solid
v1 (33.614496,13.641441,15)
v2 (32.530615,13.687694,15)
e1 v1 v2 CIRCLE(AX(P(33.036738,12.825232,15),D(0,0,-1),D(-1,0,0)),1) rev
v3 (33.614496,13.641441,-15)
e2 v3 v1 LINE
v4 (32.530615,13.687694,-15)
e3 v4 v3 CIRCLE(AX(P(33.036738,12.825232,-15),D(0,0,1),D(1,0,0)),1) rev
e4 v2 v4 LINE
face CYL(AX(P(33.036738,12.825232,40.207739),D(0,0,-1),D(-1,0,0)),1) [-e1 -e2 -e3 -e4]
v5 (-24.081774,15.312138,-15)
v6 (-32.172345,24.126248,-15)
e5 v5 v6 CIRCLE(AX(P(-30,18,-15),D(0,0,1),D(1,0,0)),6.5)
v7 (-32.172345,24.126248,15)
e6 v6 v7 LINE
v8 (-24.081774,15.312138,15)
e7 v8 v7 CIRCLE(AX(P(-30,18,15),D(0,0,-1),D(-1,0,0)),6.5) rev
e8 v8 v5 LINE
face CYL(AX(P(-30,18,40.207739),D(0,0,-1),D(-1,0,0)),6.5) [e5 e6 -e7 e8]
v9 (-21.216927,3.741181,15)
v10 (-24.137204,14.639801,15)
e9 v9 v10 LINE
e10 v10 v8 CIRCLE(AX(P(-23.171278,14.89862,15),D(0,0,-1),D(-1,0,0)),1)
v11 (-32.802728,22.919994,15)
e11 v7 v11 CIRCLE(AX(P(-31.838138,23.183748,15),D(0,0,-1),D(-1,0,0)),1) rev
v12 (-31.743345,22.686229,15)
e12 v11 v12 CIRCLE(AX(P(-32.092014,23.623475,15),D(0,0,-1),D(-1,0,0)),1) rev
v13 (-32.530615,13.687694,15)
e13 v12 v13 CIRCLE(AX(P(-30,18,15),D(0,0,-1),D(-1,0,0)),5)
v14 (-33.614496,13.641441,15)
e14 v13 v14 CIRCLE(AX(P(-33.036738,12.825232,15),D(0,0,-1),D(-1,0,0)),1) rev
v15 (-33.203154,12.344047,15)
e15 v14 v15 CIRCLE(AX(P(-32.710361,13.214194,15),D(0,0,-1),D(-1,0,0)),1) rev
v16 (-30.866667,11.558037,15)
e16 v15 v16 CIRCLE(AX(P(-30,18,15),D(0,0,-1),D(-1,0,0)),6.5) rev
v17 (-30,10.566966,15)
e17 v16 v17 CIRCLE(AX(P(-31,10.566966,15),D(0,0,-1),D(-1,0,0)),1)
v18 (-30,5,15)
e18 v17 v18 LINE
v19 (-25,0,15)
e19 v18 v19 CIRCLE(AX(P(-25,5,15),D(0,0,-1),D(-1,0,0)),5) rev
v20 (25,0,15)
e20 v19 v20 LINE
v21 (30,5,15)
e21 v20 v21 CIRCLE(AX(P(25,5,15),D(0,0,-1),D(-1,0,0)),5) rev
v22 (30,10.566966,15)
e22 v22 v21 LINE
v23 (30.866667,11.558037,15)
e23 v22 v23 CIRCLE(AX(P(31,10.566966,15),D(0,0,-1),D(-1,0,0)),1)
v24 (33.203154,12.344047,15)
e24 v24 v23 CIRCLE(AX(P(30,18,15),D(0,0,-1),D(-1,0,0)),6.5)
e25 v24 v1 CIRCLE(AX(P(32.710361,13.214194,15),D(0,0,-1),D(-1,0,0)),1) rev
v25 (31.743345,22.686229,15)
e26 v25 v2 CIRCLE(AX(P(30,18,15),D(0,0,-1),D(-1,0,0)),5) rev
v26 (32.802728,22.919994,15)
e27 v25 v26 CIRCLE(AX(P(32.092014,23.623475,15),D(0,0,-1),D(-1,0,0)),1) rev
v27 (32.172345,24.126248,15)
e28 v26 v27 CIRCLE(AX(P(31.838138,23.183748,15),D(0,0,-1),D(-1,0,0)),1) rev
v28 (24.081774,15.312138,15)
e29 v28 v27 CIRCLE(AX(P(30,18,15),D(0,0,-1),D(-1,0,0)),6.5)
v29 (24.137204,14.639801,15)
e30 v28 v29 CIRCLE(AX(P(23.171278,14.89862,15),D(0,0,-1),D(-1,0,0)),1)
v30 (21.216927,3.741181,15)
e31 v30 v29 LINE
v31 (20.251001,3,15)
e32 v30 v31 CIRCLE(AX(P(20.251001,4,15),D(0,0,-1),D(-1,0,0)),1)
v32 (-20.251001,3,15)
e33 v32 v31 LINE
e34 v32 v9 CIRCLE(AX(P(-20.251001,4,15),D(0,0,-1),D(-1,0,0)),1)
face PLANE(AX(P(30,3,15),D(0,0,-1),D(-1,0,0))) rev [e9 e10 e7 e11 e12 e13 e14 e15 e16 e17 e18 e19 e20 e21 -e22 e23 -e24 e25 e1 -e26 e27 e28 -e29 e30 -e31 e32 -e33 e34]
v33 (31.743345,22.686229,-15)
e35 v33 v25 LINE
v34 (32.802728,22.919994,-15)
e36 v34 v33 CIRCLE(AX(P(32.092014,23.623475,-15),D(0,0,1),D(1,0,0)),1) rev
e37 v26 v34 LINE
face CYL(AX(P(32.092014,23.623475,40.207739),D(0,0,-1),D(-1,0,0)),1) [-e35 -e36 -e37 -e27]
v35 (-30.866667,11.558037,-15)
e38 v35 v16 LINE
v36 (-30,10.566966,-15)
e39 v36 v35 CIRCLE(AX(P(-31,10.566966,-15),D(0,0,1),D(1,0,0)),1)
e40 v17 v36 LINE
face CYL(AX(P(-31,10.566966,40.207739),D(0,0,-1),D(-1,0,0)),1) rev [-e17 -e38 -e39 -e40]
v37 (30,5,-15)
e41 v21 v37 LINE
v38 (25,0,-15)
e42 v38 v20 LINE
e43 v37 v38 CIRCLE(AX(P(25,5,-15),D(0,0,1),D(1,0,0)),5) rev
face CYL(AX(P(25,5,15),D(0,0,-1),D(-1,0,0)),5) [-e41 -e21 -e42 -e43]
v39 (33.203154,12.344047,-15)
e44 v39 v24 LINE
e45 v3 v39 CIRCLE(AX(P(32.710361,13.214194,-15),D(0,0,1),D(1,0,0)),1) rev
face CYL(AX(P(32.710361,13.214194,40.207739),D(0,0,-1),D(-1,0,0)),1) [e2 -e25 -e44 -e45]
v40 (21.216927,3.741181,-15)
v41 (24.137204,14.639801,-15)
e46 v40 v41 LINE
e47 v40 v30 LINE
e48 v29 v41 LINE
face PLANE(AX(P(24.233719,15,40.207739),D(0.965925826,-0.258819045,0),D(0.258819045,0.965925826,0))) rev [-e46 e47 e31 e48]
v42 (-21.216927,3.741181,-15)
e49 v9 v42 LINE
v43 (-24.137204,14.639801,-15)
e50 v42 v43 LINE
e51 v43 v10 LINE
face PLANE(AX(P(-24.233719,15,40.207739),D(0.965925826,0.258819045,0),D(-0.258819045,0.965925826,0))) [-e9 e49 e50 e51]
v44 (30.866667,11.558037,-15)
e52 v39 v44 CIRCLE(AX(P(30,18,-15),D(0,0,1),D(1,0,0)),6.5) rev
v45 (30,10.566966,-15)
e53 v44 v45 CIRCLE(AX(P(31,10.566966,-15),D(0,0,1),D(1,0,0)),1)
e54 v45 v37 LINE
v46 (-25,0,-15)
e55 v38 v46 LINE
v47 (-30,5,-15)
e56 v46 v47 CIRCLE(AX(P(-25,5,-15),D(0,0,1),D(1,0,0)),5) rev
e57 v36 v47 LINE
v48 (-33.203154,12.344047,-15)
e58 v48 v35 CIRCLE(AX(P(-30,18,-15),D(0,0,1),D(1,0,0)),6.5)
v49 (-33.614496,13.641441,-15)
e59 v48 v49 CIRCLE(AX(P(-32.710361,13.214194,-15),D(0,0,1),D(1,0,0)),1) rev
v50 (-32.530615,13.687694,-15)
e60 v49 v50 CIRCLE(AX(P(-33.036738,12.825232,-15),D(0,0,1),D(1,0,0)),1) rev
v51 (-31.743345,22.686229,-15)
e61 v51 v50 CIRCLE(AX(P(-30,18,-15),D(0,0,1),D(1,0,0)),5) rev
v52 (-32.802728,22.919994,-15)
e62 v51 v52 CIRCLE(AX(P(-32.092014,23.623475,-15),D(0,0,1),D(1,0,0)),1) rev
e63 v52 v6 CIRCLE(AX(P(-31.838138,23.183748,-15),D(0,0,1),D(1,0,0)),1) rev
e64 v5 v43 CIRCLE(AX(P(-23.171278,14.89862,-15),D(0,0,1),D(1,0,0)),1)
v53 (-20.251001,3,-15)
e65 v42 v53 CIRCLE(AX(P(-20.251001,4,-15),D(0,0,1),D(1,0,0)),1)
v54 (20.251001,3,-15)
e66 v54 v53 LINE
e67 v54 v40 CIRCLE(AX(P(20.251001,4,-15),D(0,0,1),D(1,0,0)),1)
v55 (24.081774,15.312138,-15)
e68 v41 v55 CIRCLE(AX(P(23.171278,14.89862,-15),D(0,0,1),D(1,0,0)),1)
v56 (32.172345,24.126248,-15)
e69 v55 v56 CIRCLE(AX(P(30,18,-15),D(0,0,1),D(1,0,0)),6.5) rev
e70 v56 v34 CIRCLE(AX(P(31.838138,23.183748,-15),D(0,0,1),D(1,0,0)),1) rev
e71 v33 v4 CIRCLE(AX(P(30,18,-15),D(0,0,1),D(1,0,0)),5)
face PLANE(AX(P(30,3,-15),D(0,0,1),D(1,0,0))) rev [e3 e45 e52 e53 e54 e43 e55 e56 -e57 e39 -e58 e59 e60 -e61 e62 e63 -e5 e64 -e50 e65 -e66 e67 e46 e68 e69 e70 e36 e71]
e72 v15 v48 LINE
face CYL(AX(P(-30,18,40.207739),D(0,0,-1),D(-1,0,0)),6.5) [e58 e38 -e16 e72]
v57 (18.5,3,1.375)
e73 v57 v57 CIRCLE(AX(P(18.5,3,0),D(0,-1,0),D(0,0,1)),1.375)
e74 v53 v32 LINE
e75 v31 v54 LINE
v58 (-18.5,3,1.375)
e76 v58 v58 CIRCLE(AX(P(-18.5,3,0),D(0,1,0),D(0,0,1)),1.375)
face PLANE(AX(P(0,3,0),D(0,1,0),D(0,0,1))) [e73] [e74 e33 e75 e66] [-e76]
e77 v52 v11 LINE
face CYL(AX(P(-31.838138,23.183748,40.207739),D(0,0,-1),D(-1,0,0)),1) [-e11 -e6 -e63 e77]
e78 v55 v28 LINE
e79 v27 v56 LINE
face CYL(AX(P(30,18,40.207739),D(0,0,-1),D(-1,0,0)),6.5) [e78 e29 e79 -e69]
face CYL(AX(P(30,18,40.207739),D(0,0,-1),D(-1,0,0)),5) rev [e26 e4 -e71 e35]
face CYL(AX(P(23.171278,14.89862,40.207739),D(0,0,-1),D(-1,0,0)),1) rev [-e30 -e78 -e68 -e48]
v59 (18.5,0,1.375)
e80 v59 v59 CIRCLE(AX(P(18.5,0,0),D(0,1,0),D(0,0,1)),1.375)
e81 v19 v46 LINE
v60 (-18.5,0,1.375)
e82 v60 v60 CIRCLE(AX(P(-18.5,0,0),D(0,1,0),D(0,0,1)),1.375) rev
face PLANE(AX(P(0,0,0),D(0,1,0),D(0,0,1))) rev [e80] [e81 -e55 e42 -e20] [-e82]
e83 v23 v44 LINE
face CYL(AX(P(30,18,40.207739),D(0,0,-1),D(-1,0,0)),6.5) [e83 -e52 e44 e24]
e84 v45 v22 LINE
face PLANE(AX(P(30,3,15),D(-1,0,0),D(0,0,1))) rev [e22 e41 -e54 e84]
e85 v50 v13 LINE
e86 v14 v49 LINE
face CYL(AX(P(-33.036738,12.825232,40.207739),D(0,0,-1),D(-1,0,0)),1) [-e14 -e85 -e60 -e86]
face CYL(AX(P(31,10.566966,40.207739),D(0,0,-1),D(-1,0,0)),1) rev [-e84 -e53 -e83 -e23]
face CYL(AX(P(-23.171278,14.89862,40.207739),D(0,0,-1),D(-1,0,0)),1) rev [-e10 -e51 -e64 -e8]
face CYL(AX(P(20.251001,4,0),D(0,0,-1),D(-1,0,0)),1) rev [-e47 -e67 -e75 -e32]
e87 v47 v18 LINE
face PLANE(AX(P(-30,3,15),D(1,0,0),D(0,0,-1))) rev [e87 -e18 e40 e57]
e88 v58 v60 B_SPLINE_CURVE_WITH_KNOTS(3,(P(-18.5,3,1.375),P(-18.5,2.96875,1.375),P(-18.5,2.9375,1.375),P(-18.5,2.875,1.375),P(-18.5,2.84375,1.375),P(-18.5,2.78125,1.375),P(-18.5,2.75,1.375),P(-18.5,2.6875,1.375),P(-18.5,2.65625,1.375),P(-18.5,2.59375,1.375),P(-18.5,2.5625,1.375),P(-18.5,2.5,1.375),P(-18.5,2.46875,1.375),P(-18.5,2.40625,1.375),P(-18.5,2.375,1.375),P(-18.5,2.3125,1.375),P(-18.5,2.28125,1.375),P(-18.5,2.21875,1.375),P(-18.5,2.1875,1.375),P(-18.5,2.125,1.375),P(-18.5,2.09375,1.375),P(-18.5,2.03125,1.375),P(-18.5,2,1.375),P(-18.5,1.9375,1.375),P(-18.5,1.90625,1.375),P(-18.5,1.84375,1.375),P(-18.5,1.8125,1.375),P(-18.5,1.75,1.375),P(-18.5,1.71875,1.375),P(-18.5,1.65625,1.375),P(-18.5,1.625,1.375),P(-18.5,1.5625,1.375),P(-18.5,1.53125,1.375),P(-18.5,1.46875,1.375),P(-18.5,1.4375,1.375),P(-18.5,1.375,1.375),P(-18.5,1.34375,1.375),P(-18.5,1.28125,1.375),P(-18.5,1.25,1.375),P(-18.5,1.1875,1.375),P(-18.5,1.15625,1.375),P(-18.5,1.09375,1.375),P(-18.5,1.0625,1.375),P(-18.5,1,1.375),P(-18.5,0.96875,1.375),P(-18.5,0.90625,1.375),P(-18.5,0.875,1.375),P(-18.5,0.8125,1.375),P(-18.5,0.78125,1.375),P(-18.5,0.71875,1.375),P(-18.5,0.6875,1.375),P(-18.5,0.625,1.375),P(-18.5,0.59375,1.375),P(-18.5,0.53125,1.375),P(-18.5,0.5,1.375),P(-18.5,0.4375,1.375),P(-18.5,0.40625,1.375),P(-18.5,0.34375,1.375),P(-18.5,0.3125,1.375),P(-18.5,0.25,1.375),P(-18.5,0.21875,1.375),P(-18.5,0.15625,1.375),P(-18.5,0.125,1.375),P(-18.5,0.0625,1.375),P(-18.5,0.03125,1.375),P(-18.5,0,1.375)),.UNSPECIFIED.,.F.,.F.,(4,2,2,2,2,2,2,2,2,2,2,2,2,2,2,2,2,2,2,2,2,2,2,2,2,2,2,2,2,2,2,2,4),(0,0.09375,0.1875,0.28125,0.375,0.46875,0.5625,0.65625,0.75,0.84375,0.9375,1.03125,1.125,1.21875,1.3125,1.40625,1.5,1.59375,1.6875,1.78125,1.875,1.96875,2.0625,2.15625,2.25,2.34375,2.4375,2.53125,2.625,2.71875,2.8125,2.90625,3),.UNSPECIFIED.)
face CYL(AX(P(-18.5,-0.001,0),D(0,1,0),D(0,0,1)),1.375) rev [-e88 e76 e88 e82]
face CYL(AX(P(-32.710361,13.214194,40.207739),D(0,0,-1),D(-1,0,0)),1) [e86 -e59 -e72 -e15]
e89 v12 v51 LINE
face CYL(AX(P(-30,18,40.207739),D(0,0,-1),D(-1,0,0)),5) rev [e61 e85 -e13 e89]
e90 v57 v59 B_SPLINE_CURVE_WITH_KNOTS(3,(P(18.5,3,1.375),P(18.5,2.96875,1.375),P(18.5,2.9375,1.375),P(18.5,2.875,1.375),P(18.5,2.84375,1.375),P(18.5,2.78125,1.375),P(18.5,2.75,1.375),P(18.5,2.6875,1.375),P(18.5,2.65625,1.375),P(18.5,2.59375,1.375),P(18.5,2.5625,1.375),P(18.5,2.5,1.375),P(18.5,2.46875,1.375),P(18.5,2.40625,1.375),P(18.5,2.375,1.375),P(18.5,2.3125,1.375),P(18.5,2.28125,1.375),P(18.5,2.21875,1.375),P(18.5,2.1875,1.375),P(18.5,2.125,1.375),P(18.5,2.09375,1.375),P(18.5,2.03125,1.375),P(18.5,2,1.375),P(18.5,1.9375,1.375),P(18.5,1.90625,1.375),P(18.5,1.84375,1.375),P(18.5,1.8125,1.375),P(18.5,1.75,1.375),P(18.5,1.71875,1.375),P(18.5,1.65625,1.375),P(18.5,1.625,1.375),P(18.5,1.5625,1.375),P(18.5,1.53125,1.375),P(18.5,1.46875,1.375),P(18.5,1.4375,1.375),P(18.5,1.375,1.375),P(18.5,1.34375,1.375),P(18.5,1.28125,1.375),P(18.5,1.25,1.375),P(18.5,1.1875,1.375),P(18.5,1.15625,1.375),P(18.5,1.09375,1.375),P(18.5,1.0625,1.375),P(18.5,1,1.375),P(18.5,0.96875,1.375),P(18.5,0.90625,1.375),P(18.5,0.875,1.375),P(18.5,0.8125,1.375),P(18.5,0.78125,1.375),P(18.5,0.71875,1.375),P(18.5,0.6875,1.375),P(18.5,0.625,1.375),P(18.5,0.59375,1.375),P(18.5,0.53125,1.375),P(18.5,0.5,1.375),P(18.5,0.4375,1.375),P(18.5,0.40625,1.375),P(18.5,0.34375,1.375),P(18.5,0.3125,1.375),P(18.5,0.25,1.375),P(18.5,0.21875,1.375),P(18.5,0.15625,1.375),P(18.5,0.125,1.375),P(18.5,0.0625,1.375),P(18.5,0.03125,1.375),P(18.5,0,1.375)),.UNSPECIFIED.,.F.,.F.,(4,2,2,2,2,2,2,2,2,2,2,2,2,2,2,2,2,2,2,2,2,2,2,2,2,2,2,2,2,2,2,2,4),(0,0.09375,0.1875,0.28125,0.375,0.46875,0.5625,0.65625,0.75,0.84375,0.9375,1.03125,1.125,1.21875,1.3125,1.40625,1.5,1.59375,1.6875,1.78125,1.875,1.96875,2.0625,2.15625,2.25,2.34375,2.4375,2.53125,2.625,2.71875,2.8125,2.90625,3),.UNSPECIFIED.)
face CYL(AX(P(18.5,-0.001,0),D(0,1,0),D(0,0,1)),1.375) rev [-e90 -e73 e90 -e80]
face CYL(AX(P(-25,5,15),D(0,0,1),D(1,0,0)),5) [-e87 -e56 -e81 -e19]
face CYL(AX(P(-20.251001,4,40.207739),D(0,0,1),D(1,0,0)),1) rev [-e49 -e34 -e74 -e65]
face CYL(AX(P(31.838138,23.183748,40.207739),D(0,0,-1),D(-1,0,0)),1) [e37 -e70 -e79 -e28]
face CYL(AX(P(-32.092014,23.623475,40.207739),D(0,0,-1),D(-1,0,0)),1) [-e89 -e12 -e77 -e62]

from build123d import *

# Parameters (mm, degrees)
BOSS_EXTRUDE1_DEPTH             = 3
CUT_EXTRUDE1_REACH              = 35.675
SKETCH2_R                       = 1.3750000000000009
BOSS_EXTRUDE2_REACH             = 35.675
BOSS_EXTRUDE2_DIRECTION_2_REACH = 35.675
FILLET3_R                       = 1
FILLET3_OF_MIRROR2_R            = 1
FILLET6_R                       = 5
FILLET7_R                       = 1


with BuildPart() as part:
    # Sketch1 → Boss-Extrude1 (new body)
    with BuildSketch(Plane(origin=(0, 0, 0), x_dir=(1, 0, 0), z_dir=(0, 1, 0))):
        Polygon((30, -14.999999999999993), (-29.999999999999996, -15.000000000000002), (-29.999999999999996, 14.999999999999998), (30.000000000000004, 15.000000000000005), align=None)
    extrude(amount=BOSS_EXTRUDE1_DEPTH)

    # Sketch2 → Cut-Extrude1 (cut, up to next)
    with BuildSketch(Plane(origin=(0, 3, 0), x_dir=(1, 0, 0), z_dir=(0, 1, 0)), mode=Mode.PRIVATE) as cut_extrude1_sk1:
        with Locations(Location((-18.5, 0, 0), (0, 0, 270))):
            Circle(SKETCH2_R)
    cut_extrude1_tool1 = extrude(cut_extrude1_sk1.sketch, amount=-CUT_EXTRUDE1_REACH, mode=Mode.PRIVATE) & part.part
    cut_extrude1 = cut_extrude1_tool1.solids().sort_by_distance((-18.5, 3, 0))[0]
    add(cut_extrude1, mode=Mode.SUBTRACT)

    # Mirror1: Cut-Extrude1 across plane
    add(cut_extrude1.mirror(Plane(origin=(0, 0, 0), x_dir=(0, 0, 1), z_dir=(1, 0, 0))), mode=Mode.SUBTRACT)

    # Boss-Extrude2: up to this face of the body (flat: up to its plane)
    boss_extrude2_end = Plane(part.part.faces().sort_by_distance((0, 1.5, 15))[0])
    # Sketch3 → Boss-Extrude2 (add, up to the picked face)
    with BuildSketch(Plane.XY, mode=Mode.PRIVATE) as boss_extrude2_sk1:
        with BuildLine():
            Line((24.23371870266459, 15.000000000000002), (21.01832839349107, 3))
            Line((21.01832839349107, 3), (30, 3))
            Line((30, 3), (29.999999999999996, 11.500000000107407))
            ThreePointArc((29.999999999999996, 11.500000000107407), (32.223130931464034, 11.891997965331278), (34.17811946267373, 13.020711120091907))
            Line((34.17811946267373, 13.020711120091907), (33.213938048141515, 14.169777784768357))
            ThreePointArc((33.213938048141515, 14.169777784768357), (25.019026509541703, 17.564221286256522), (32.50000000000003, 22.3301270189222))
            Line((32.50000000000003, 22.3301270189222), (33.250000000000036, 23.62916512459886))
            ThreePointArc((33.250000000000036, 23.62916512459886), (25.505721350569345, 22.695898148519827), (24.23371870266459, 15.000000000000002))
        make_face()
    boss_extrude2_tool1 = split(extrude(boss_extrude2_sk1.sketch, amount=BOSS_EXTRUDE2_REACH, mode=Mode.PRIVATE), bisect_by=boss_extrude2_end, keep=Keep.BOTH, mode=Mode.PRIVATE)
    boss_extrude2 = boss_extrude2_tool1.solids().sort_by(Axis((26.59731, 11.034621, 0), (0, 0, 1)))[0]
    add(boss_extrude2)

    # Boss-Extrude2 direction 2: up to this face of the body (flat: up to its plane)
    boss_extrude2_direction_2_end = Plane(part.part.faces().sort_by_distance((0, 1.5, -15))[0])
    # Sketch3 → Boss-Extrude2 direction 2 (add, up to the picked face)
    with BuildSketch(Plane.XY, mode=Mode.PRIVATE) as boss_extrude2_direction_2_sk1:
        with BuildLine():
            Line((24.23371870266459, 15.000000000000002), (21.01832839349107, 3))
            Line((21.01832839349107, 3), (30, 3))
            Line((30, 3), (29.999999999999996, 11.500000000107407))
            ThreePointArc((29.999999999999996, 11.500000000107407), (32.223130931464034, 11.891997965331278), (34.17811946267373, 13.020711120091907))
            Line((34.17811946267373, 13.020711120091907), (33.213938048141515, 14.169777784768357))
            ThreePointArc((33.213938048141515, 14.169777784768357), (25.019026509541703, 17.564221286256522), (32.50000000000003, 22.3301270189222))
            Line((32.50000000000003, 22.3301270189222), (33.250000000000036, 23.62916512459886))
            ThreePointArc((33.250000000000036, 23.62916512459886), (25.505721350569345, 22.695898148519827), (24.23371870266459, 15.000000000000002))
        make_face()
    boss_extrude2_direction_2_tool1 = split(extrude(boss_extrude2_direction_2_sk1.sketch, amount=-BOSS_EXTRUDE2_DIRECTION_2_REACH, mode=Mode.PRIVATE), bisect_by=boss_extrude2_direction_2_end, keep=Keep.BOTH, mode=Mode.PRIVATE)
    boss_extrude2_direction_2 = boss_extrude2_direction_2_tool1.solids().sort_by(Axis((26.59731, 11.034621, 0), (0, 0, -1)))[0]
    add(boss_extrude2_direction_2)

    # Fillet3
    # the kernel refuses this fillet: 1 mm, written as the material it adds along each edge
    with BuildSketch(Plane(origin=(29.999999999999996, 11.500000000107406, -15.000000000000002), x_dir=(0.9977653155349889, 0.06681597949116533, 0), z_dir=(0, 0, 1))) as fillet3_piece_1:
        with BuildLine():
            CenterArc((0.9354237099720605, -0.99776531555048), FILLET3_R, 93.83112782826316, 82.33774433018942)
            Line((-0.06234160556292847, -0.9309493360593146), (0, 0))
            ThreePointArc((0, 0), (0.4343038653561172, -0.01452544892746713), (0.8686077307122309, -1e-17))
        make_face()
    extrude(amount=30)
    # the kernel refuses this fillet: 1 mm, written as the material it takes off along each edge
    with BuildSketch(Plane(origin=(33.250000000000036, 23.62916512459886, 17.96693441323381), x_dir=(-0.9080543065649367, 0.4188524517403138, 0), z_dir=(0, 0, -1))) as fillet3_2_piece_1:
        with BuildLine():
            CenterArc((1.0954834756555598, -0.995824323371254), FILLET3_R, 84.76215915180506, 100.47568169639004)
            Line((0.09965915228430783, -1.0871146130092202), (0, 0))
            ThreePointArc((0, 0), (0.5933868826467665, 0.02714189808684594), (1.1867737652935233, 0))
        make_face()
    extrude(amount=35.93386882646762, mode=Mode.SUBTRACT)
    with BuildSketch(Plane(origin=(32.50000000000003, 22.3301270189222, -17.290199457863853), x_dir=(0.5000000000000039, 0.8660254037844365, 0), z_dir=(0, 0, 1))) as fillet3_2_piece_2:
        with BuildLine():
            CenterArc((0.9160797831455422, 0.9999999999999977), FILLET3_R, 189.59406822434758, 80.40593177565233)
            ThreePointArc((-0.06993351404503671, 0.8333333333765751), (-0.01751405270363253, 0.41813130141934185), (0, 0))
            Line((0, 0), (0.9160797831455412, -3e-17))
        make_face()
    extrude(amount=34.5803989157277, mode=Mode.SUBTRACT)
    with BuildSketch(Plane(origin=(34.17811946267373, 13.02071112009191, -17.96693441327771), x_dir=(-0.6427876096881444, 0.7660444431176312, 0), z_dir=(0, 0, 1))) as fillet3_2_piece_3:
        with BuildLine():
            CenterArc((1.0916730868583728, 1.0000000000000009), FILLET3_R, 169.52431830288586, 100.47568169711377)
            ThreePointArc((0.1083409208250382, 1.1818181818306124), (0.02714189812493758, 0.5933868826533465), (0, 0))
            Line((0, 0), (1.0916730868583666, -2e-17))
        make_face()
    extrude(amount=35.93386882655541, mode=Mode.SUBTRACT)
    with BuildSketch(Plane(origin=(33.213938048141515, 14.169777784768355, -17.29019945772614), x_dir=(-0.8171150585222966, -0.5764746144767381, 0), z_dir=(0, 0, 1))) as fillet3_2_piece_4:
        with BuildLine():
            CenterArc((0.9198888630675175, 0.9964971894548403), FILLET3_R, 184.7970341139915, 80.40593177249599)
            Line((-0.0766083263866242, 0.9128709291653951), (0, 0))
            ThreePointArc((0, 0), (0.4181313013932034, 0.01751405272528074), (0.8362626027864033, 2e-17))
        make_face()
    extrude(amount=34.58039891545228, mode=Mode.SUBTRACT)

    # Mirror2: Boss-Extrude2, Boss-Extrude2 direction 2 across plane
    add(boss_extrude2.mirror(Plane(origin=(0, 0, 0), x_dir=(0, 0, 1), z_dir=(1, 0, 0))))
    add(boss_extrude2_direction_2.mirror(Plane(origin=(0, 0, 0), x_dir=(0, 0, 1), z_dir=(1, 0, 0))))

    # Fillet3 of Mirror2
    # the kernel refuses this fillet: 1 mm, written as the material it adds along each edge
    with BuildSketch(Plane(origin=(-29.999999999999996, 11.500000000107406, 14.999999999999998), x_dir=(-0.9977653155349889, 0.06681597949116533, 0), z_dir=(0, 0, -1))) as fillet3_of_mirror2_piece_1:
        with BuildLine():
            CenterArc((0.9354237099720605, -0.99776531555048), FILLET3_OF_MIRROR2_R, 93.83112782826316, 82.33774433018942)
            Line((-0.06234160556292847, -0.9309493360593146), (0, 0))
            ThreePointArc((0, 0), (0.4343038653561172, -0.01452544892746713), (0.8686077307122309, -1e-17))
        make_face()
    extrude(amount=30)
    # the kernel refuses this fillet: 1 mm, written as the material it takes off along each edge
    with BuildSketch(Plane(origin=(-33.250000000000036, 23.629165124598856, 17.966934413233812), x_dir=(0.5000000000000044, -0.866025403784436, 0), z_dir=(0, 0, -1))) as fillet3_of_mirror2_2_piece_1:
        with BuildLine():
            CenterArc((1.0916730868040134, -1.0000000000000007), FILLET3_OF_MIRROR2_R, 90.00000000000007, 100.47568169639015)
            ThreePointArc((0.10834092076838271, -1.181818181818188), (0.02714189808684512, -0.5933868826467682), (0, 0))
            Line((0, 0), (1.091673086804012, -2e-17))
        make_face()
    extrude(amount=35.93386882646763, mode=Mode.SUBTRACT)
    with BuildSketch(Plane(origin=(-32.50000000000003, 22.3301270189222, 17.29019945786385), x_dir=(0.9048050109861938, 0.42582612894733674, 0), z_dir=(0, 0, -1))) as fillet3_of_mirror2_2_piece_2:
        with BuildLine():
            CenterArc((0.9198888631228366, -0.996497189454418), FILLET3_OF_MIRROR2_R, 94.79703411380164, 80.40593177565235)
            Line((-0.07660832633633094, -0.9128709292248977), (0, 0))
            ThreePointArc((0, 0), (0.41813130141834665, -0.01751405272739198), (0.8362626028366937, -2e-17))
        make_face()
    extrude(amount=34.5803989157277, mode=Mode.SUBTRACT)
    with BuildSketch(Plane(origin=(-34.17811946267373, 13.020711120091908, 17.966934413277702), x_dir=(0.8215259563306123, -0.5701711173630887, 0), z_dir=(0, 0, -1))) as fillet3_of_mirror2_2_piece_3:
        with BuildLine():
            CenterArc((1.0954834757069158, -0.995824323374353), FILLET3_OF_MIRROR2_R, 84.76215915375006, 100.47568169711377)
            Line((0.09965915233991275, -1.0871146130587033), (0, 0))
            ThreePointArc((0, 0), (0.59338688265553, 0.02714189807715625), (1.1867737653110744, 8e-17))
        make_face()
    extrude(amount=35.9338688265554, mode=Mode.SUBTRACT)
    with BuildSketch(Plane(origin=(-33.213938048141515, 14.169777784768355, 17.290199457726136), x_dir=(-0.6427876096881426, -0.7660444431176326, 0), z_dir=(0, 0, -1))) as fillet3_of_mirror2_2_piece_4:
        with BuildLine():
            CenterArc((0.916079783090449, -1.0000000000000009), FILLET3_OF_MIRROR2_R, 89.99999999999977, 80.40593177249599)
            ThreePointArc((-0.06993351409094786, -0.8333333333222552), (-0.01751405272878019, -0.4181313013930569), (0, 0))
            Line((0, 0), (0.916079783090453, 2e-17))
        make_face()
    extrude(amount=34.58039891545228, mode=Mode.SUBTRACT)

    # Fillet6
    fillet6_edges = [part.edges().sort_by_distance(p)[0] for p in [
        (30, 0, -5.33e-15),
        (-29.999999999999996, 0, 1.78e-15),
    ]]
    fillet(fillet6_edges, radius=FILLET6_R)

    # Fillet7
    fillet7_edges = [part.edges().sort_by_distance(p)[0] for p in [
        (21.01832839349107, 3, -1.78e-15),
        (24.23371870266459, 15.000000000000004, -1.78e-15),
        (-24.23371870266459, 15.000000000000004, -1.78e-15),
        (-21.01832839349107, 3, -1.78e-15),
    ]]
    fillet(fillet7_edges, radius=FILLET7_R)


solid = part.part
